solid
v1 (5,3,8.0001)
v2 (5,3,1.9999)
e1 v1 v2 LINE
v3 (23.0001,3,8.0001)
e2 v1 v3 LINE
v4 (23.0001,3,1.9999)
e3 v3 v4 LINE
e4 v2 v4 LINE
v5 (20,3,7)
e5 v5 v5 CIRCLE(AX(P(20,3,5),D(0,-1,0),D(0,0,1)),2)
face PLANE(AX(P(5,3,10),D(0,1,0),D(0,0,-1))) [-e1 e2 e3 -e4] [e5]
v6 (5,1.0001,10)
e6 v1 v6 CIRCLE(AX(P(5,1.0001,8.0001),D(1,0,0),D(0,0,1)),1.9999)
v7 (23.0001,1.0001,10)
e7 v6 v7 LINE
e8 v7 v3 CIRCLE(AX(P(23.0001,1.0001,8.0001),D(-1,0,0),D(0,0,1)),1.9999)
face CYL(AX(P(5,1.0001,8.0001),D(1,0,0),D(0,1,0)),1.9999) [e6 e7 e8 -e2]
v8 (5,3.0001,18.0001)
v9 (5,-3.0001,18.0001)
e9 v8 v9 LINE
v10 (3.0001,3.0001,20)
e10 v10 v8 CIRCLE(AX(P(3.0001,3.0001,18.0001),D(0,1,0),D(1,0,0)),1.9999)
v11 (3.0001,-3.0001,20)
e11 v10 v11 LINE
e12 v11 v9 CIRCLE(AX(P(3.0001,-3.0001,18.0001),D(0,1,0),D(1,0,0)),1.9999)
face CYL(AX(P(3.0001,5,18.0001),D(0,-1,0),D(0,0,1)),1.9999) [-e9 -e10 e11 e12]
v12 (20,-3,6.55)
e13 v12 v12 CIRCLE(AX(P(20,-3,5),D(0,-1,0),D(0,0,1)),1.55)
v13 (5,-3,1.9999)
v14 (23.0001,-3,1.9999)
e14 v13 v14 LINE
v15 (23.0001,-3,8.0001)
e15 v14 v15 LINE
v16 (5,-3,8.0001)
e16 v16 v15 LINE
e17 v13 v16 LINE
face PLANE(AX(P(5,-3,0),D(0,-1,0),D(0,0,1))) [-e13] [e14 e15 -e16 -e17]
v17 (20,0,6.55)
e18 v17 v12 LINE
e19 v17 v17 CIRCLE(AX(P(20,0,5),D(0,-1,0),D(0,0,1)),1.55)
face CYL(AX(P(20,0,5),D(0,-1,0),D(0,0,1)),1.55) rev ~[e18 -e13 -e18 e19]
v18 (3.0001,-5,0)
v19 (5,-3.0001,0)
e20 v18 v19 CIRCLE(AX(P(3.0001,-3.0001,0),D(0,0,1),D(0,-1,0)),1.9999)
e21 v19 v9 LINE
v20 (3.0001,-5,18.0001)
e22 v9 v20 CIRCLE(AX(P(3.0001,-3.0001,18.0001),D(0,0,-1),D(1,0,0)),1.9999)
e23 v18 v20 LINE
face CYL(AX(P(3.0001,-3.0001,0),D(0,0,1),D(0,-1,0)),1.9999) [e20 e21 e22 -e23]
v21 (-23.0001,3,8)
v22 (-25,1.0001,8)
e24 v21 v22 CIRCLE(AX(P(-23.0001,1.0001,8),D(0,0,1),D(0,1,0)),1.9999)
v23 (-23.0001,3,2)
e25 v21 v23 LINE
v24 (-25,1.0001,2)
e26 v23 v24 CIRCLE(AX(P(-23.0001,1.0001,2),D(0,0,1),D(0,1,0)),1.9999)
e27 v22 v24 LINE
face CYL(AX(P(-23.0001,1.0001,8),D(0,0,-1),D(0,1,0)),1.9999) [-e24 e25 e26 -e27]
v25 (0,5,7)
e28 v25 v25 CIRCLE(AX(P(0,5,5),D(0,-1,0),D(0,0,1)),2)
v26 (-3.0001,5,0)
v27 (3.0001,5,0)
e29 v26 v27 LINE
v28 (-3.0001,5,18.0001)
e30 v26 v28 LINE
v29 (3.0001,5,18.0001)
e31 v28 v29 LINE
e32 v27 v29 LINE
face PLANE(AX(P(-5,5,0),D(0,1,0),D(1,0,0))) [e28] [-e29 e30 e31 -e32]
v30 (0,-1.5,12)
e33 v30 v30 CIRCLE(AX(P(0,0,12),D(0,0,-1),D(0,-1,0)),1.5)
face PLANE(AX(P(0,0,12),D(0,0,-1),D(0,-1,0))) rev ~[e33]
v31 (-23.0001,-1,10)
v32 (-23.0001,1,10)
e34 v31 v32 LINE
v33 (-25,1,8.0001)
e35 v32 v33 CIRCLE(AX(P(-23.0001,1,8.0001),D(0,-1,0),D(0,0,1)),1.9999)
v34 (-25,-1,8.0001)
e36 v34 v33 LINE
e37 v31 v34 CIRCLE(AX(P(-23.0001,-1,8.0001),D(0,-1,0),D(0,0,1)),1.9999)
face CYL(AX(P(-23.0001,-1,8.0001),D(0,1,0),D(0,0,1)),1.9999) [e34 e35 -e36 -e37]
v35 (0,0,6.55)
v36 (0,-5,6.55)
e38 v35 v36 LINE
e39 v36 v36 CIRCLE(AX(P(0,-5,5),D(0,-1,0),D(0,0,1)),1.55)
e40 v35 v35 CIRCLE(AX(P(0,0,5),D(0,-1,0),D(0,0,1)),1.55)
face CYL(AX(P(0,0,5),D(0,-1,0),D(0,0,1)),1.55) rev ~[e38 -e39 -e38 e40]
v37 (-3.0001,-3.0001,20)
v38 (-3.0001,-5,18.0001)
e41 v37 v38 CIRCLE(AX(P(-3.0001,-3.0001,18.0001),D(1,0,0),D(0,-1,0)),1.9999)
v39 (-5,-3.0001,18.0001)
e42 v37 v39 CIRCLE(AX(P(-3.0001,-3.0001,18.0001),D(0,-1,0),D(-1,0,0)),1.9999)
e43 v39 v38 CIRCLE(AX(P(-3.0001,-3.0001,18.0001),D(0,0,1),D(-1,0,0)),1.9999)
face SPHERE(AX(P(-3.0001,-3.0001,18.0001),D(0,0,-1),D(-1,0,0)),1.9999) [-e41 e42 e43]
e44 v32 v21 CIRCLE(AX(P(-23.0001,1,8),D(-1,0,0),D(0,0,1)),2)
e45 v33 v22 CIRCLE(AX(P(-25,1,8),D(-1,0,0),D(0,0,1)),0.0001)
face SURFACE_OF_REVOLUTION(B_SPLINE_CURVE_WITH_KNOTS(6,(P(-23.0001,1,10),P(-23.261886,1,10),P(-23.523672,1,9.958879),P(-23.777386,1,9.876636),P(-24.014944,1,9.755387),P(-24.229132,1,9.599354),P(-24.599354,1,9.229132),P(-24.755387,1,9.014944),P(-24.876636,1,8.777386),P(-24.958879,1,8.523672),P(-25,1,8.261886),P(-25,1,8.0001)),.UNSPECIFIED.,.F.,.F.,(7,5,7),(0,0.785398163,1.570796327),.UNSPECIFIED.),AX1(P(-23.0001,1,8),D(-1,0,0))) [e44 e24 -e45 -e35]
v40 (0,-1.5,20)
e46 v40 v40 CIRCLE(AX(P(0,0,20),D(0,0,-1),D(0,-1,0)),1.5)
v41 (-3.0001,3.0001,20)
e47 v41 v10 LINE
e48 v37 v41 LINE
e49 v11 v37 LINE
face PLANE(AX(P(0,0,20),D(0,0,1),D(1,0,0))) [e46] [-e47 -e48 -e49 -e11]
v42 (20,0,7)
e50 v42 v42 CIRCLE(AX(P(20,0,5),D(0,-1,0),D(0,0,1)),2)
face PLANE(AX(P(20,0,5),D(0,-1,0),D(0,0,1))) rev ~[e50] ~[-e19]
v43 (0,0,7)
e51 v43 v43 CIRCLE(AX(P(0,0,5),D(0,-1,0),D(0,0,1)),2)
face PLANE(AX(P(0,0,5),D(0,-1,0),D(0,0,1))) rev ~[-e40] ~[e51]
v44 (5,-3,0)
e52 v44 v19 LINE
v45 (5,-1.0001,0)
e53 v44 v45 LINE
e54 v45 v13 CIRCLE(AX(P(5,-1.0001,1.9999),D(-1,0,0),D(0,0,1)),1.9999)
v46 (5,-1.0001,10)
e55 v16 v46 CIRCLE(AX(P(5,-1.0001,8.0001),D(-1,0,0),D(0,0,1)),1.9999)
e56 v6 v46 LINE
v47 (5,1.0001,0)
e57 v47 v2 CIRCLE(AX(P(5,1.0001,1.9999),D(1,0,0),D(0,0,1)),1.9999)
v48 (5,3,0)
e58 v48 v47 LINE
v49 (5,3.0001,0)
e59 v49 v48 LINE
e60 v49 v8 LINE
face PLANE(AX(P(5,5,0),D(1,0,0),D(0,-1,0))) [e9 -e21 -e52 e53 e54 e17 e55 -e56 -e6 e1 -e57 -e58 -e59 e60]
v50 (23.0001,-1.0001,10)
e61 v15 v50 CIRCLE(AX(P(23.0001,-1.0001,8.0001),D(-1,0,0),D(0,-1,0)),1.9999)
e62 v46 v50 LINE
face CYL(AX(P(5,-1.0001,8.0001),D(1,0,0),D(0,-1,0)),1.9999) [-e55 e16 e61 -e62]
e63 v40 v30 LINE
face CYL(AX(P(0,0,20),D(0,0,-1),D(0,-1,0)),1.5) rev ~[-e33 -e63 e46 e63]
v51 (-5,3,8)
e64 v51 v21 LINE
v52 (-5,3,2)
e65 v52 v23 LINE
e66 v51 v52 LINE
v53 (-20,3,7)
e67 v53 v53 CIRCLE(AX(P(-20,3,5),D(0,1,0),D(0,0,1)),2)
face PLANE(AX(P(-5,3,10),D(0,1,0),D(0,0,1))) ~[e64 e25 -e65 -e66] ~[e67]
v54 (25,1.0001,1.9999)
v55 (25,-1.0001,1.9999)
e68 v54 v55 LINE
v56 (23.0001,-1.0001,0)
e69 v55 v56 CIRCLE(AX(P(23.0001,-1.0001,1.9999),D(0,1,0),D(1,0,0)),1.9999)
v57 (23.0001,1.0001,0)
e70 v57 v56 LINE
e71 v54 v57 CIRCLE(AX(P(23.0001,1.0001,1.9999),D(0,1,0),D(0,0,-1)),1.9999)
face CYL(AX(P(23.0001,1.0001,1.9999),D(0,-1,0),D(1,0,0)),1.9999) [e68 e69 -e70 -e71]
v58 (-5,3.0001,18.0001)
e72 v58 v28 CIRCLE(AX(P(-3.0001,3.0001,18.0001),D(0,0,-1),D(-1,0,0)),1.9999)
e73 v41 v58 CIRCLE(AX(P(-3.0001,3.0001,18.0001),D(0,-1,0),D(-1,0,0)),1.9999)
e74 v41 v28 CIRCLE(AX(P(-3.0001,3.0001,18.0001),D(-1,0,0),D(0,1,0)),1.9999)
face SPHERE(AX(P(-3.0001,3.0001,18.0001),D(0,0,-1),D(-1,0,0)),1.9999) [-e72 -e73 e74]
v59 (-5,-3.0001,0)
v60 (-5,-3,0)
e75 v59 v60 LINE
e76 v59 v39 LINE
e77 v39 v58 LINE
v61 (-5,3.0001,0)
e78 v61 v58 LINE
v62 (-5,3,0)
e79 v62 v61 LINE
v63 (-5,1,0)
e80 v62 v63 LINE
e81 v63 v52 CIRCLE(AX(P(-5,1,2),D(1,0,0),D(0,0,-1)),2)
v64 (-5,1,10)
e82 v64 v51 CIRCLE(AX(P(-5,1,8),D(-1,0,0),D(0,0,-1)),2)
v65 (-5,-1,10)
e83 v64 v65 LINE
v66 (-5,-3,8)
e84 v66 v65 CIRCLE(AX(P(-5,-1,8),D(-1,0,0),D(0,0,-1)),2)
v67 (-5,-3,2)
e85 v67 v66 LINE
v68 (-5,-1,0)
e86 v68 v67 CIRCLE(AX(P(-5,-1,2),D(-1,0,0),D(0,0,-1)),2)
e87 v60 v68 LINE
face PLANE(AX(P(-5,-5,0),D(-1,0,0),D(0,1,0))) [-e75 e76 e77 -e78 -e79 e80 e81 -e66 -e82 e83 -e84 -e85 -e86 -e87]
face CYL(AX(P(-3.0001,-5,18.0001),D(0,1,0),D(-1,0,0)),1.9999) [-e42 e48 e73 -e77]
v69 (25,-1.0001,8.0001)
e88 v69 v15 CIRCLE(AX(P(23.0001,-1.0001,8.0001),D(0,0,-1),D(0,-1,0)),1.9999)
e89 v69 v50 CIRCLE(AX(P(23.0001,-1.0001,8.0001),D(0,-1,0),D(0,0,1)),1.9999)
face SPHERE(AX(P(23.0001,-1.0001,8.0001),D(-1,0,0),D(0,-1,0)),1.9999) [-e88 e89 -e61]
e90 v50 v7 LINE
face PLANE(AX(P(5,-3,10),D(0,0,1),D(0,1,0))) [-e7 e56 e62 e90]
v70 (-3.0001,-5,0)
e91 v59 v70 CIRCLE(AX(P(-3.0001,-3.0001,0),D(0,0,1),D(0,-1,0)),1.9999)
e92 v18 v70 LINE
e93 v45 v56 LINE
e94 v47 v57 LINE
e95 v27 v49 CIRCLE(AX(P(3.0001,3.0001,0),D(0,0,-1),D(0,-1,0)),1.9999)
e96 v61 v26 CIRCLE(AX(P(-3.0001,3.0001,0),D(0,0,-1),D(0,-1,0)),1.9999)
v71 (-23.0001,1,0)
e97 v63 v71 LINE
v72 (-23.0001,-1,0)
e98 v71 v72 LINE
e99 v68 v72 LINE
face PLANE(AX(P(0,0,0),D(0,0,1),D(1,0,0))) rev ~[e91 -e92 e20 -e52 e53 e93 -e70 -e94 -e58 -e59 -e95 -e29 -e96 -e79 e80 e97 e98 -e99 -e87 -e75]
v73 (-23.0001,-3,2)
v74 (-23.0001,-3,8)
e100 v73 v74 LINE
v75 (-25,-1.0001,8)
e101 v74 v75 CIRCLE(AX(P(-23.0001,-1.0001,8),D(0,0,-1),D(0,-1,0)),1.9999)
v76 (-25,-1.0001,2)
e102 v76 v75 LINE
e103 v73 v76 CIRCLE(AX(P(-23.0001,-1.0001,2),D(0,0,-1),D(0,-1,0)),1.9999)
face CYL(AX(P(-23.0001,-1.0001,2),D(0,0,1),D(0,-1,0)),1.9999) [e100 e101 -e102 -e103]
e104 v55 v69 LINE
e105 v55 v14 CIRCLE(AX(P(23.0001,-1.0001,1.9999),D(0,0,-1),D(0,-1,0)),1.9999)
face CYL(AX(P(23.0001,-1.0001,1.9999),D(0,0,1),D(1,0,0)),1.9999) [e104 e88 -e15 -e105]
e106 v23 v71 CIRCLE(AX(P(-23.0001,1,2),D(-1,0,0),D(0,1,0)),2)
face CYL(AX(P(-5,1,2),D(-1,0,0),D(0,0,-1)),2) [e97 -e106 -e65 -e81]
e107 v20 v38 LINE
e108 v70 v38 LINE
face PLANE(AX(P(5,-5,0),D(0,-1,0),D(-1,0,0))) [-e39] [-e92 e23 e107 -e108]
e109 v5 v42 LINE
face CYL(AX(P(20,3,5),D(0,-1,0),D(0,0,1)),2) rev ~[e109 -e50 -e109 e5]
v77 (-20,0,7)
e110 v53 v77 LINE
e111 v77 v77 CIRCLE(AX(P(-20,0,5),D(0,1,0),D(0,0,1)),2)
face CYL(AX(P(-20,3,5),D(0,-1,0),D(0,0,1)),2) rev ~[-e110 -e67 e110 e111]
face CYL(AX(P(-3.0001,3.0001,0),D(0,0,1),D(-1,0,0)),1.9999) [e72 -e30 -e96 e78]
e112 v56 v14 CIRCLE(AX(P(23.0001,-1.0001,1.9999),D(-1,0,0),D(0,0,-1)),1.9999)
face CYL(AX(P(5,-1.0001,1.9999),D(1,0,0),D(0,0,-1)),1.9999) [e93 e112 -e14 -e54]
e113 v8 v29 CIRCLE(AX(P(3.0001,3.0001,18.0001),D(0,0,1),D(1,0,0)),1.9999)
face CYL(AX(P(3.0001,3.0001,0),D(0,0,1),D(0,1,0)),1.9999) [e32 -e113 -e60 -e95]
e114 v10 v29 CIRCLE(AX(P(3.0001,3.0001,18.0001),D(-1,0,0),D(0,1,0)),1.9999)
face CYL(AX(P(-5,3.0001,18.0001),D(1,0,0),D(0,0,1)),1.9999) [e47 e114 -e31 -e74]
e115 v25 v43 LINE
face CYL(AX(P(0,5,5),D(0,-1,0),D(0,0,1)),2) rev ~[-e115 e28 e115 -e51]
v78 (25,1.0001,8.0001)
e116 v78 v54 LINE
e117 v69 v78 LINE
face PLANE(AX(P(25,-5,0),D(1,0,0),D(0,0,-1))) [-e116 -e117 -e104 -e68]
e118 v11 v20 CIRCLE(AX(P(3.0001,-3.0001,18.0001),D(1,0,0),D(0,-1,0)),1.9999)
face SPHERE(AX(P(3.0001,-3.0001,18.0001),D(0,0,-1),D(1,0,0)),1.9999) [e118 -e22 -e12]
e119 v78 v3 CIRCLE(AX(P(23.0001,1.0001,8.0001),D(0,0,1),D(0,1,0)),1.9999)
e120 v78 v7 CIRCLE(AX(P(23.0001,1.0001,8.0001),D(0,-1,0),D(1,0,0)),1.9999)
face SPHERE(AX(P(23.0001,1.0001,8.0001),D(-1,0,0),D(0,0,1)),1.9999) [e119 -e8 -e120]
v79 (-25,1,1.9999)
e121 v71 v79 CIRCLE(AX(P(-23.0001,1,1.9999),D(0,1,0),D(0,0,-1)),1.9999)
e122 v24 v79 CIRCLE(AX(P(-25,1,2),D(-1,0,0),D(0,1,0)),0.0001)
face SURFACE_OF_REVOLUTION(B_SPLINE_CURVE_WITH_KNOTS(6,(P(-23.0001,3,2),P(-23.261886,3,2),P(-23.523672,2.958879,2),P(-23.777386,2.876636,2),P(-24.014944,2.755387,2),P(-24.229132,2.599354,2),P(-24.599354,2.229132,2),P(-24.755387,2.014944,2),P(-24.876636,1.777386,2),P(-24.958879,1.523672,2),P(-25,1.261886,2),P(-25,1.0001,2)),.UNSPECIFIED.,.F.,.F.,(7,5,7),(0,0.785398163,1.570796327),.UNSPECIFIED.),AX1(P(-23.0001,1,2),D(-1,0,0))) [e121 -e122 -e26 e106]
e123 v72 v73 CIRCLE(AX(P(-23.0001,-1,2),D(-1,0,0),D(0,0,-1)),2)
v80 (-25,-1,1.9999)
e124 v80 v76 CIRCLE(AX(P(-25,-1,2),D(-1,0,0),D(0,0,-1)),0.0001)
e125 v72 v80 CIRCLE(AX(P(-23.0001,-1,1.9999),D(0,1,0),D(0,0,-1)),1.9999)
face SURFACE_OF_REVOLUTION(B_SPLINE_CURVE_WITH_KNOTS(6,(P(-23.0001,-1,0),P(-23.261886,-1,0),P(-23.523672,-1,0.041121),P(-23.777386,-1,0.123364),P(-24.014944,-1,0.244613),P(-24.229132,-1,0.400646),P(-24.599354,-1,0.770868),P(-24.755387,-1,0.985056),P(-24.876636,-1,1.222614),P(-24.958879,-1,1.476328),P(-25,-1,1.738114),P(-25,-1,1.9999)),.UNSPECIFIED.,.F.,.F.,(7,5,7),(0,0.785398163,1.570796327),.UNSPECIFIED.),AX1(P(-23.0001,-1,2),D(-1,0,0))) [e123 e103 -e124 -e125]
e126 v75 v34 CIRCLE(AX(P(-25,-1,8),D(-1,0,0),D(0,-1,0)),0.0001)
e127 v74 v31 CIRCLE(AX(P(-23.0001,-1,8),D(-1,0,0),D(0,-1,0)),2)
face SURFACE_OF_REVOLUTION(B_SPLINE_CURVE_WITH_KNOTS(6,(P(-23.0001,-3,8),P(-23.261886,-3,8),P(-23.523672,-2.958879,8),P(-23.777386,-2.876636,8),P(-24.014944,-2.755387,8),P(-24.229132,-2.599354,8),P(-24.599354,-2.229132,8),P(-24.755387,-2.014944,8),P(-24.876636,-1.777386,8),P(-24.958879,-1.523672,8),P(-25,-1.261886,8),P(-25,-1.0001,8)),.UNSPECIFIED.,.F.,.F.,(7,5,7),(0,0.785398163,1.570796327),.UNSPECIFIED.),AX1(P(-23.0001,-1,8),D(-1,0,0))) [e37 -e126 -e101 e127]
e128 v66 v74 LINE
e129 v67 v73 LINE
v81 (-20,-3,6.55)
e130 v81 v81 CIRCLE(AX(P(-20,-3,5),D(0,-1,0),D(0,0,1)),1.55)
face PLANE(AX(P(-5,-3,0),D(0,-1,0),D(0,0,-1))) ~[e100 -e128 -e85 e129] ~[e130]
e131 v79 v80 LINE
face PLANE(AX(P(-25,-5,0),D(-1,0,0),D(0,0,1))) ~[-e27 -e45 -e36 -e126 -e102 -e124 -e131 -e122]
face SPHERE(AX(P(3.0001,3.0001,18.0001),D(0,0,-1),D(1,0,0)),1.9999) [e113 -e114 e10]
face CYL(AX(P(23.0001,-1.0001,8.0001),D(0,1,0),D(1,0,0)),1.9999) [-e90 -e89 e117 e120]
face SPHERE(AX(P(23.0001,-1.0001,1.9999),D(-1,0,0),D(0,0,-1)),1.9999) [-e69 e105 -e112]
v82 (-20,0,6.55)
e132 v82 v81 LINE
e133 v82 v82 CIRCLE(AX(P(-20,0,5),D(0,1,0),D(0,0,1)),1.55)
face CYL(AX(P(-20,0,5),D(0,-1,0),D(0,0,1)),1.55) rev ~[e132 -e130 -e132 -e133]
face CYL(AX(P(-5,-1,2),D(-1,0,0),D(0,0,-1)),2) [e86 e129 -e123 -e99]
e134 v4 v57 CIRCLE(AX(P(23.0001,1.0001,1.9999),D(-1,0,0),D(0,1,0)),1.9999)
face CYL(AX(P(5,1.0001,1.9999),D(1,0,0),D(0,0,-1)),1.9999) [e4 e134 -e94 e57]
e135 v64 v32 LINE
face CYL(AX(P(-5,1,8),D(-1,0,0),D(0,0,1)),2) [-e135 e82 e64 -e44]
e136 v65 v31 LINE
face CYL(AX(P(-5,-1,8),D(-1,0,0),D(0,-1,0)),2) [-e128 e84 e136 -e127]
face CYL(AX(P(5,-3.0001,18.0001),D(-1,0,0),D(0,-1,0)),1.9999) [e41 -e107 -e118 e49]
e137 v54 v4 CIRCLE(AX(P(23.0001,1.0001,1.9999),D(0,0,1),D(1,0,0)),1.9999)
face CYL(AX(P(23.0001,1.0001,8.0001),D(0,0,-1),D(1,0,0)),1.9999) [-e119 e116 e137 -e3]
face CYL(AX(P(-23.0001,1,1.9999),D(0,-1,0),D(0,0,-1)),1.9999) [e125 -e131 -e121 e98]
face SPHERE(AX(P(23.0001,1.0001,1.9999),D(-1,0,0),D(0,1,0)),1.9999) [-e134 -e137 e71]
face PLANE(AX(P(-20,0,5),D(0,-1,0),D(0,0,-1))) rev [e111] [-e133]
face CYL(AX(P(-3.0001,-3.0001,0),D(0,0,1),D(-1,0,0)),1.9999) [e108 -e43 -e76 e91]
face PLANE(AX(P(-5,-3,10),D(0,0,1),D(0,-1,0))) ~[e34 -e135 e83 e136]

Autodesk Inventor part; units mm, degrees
ref_plane "YZ Plane" through (0, 0, 0) normal (1, 0, 0) x (0, 1, 0)
sketch "Sketch6" plane through (0, 0, 0) normal (0, 0, 1) x (1, 0, 0)
  line L0 (-5, 5) -> (5, 5)
  line L1 (5, 5) -> (5, -5)
  line L2 (5, -5) -> (-5, -5)
  line L3 (-5, -5) -> (-5, 5)
  point P0 (0, 0)
  dimension "d31" = 10
  dimension "d32" = 10
  dimension "d33" = 5
  dimension "d34" = 5
extrude "Extrusion3" add sketch "Sketch6" along normal blind 20
sketch "Sketch7" plane through (0, 0, 20) normal (0, 0, 1) x (1, 0, 0)
  point P0 (0, 0)
  point P1 (0, 0)
hole "Hole4" at (0, 0, 20) direction (0, 0, -1) diameter 3 depth 8
sketch "Sketch8" plane through (-5, 5, 0) normal (0, 1, 0) x (1, 0, 0)
  point P0 (5, 0)
  point P1 (5, -5)
  dimension "d44" = 5
hole "Hole5" at (0, 5, 5) direction (0, -1, 0) diameter 3.1 end through all counterbore diameter 4 counterbore depth 5
sketch "Sketch9" plane through (5, -5, 0) normal (1, 0, 0) x (0, 0, -1)
  line L0 (0, 10) -> (-20, 10) construction
  line L1 (-10, 10) -> (-10, 0) construction
  line L2 (0, 0) -> (-20, 0) construction
  line L3 (0, 0) -> (0, 10) projected
  line L4 (-10, 8) -> (0, 8)
  line L5 (0, 8) -> (0, 2)
  line L6 (0, 2) -> (-10, 2)
  line L7 (-10, 2) -> (-10, 8)
  line L8 (0, 5) -> (-20, 5)
  line L9 (-20, 10) -> (-20, 0) projected
  dimension "d52" = 6
extrude "Extrusion4" add sketch "Sketch9" along normal blind 20
ref_plane "Work Plane2" through (5, 3, 2) normal (0, 1, 0) x (1, 0, 0)
sketch "Sketch10" plane through (5, 3, 2) normal (0, 1, 0) x (1, 0, 0)
  line L0 (0, -6) -> (0, 0) construction
  line L1 (0, -3) -> (20, -3) construction
  line L2 (20, -6) -> (20, 0) construction
  point P0 (-5, 2)
  point P1 (15, -3)
  dimension "d56" = 5
hole "Hole6" at (20, 3, 5) direction (0, -1, 0) diameter 3.1 end through all counterbore diameter 4 counterbore depth 3
ref_plane "Work Plane1" through (0, -3, 18) normal (1, 0, 0) x (0, 0, -1)
mirror "Mirror1" about plane through (0, -3, 18) normal (1, 0, 0) of "Extrusion4", "Hole6"
fillet "Fillet3" radius 2 4 edges at (-15, 3, 0) (-15, 3, 10) (-15, -3, 10) (-15, -3, 0)
fillet "Fillet4" radius 2 12 edges at (15, 3, 0) (15, 3, 10) (15, -3, 0) (15, -3, 10) (5, 5, 10) (-5, 5, 10) (-5, -5, 10) (5, -5, 10) (-5, 0, 20) (5, 0, 20) (0, 5, 20) (0, -5, 20)
fillet "Fillet5" radius 2 16 edges at (25, -2.4142, 9.4142) (25, -3, 5) (25, -2.4142, 0.5858) (25, 0, 0) (25, 2.4142, 0.5858) (25, 3, 5) (25, 2.4142, 9.4142) (25, 0, 10) (-25, 0, 10) (-25, -2.4142, 9.4142) (-25, -3, 5) (-25, -2.4142, 0.5858) (-25, 0, 0) (-25, 2.4142, 0.5858) (-25, 3, 5) (-25, 2.4142, 9.4142)
